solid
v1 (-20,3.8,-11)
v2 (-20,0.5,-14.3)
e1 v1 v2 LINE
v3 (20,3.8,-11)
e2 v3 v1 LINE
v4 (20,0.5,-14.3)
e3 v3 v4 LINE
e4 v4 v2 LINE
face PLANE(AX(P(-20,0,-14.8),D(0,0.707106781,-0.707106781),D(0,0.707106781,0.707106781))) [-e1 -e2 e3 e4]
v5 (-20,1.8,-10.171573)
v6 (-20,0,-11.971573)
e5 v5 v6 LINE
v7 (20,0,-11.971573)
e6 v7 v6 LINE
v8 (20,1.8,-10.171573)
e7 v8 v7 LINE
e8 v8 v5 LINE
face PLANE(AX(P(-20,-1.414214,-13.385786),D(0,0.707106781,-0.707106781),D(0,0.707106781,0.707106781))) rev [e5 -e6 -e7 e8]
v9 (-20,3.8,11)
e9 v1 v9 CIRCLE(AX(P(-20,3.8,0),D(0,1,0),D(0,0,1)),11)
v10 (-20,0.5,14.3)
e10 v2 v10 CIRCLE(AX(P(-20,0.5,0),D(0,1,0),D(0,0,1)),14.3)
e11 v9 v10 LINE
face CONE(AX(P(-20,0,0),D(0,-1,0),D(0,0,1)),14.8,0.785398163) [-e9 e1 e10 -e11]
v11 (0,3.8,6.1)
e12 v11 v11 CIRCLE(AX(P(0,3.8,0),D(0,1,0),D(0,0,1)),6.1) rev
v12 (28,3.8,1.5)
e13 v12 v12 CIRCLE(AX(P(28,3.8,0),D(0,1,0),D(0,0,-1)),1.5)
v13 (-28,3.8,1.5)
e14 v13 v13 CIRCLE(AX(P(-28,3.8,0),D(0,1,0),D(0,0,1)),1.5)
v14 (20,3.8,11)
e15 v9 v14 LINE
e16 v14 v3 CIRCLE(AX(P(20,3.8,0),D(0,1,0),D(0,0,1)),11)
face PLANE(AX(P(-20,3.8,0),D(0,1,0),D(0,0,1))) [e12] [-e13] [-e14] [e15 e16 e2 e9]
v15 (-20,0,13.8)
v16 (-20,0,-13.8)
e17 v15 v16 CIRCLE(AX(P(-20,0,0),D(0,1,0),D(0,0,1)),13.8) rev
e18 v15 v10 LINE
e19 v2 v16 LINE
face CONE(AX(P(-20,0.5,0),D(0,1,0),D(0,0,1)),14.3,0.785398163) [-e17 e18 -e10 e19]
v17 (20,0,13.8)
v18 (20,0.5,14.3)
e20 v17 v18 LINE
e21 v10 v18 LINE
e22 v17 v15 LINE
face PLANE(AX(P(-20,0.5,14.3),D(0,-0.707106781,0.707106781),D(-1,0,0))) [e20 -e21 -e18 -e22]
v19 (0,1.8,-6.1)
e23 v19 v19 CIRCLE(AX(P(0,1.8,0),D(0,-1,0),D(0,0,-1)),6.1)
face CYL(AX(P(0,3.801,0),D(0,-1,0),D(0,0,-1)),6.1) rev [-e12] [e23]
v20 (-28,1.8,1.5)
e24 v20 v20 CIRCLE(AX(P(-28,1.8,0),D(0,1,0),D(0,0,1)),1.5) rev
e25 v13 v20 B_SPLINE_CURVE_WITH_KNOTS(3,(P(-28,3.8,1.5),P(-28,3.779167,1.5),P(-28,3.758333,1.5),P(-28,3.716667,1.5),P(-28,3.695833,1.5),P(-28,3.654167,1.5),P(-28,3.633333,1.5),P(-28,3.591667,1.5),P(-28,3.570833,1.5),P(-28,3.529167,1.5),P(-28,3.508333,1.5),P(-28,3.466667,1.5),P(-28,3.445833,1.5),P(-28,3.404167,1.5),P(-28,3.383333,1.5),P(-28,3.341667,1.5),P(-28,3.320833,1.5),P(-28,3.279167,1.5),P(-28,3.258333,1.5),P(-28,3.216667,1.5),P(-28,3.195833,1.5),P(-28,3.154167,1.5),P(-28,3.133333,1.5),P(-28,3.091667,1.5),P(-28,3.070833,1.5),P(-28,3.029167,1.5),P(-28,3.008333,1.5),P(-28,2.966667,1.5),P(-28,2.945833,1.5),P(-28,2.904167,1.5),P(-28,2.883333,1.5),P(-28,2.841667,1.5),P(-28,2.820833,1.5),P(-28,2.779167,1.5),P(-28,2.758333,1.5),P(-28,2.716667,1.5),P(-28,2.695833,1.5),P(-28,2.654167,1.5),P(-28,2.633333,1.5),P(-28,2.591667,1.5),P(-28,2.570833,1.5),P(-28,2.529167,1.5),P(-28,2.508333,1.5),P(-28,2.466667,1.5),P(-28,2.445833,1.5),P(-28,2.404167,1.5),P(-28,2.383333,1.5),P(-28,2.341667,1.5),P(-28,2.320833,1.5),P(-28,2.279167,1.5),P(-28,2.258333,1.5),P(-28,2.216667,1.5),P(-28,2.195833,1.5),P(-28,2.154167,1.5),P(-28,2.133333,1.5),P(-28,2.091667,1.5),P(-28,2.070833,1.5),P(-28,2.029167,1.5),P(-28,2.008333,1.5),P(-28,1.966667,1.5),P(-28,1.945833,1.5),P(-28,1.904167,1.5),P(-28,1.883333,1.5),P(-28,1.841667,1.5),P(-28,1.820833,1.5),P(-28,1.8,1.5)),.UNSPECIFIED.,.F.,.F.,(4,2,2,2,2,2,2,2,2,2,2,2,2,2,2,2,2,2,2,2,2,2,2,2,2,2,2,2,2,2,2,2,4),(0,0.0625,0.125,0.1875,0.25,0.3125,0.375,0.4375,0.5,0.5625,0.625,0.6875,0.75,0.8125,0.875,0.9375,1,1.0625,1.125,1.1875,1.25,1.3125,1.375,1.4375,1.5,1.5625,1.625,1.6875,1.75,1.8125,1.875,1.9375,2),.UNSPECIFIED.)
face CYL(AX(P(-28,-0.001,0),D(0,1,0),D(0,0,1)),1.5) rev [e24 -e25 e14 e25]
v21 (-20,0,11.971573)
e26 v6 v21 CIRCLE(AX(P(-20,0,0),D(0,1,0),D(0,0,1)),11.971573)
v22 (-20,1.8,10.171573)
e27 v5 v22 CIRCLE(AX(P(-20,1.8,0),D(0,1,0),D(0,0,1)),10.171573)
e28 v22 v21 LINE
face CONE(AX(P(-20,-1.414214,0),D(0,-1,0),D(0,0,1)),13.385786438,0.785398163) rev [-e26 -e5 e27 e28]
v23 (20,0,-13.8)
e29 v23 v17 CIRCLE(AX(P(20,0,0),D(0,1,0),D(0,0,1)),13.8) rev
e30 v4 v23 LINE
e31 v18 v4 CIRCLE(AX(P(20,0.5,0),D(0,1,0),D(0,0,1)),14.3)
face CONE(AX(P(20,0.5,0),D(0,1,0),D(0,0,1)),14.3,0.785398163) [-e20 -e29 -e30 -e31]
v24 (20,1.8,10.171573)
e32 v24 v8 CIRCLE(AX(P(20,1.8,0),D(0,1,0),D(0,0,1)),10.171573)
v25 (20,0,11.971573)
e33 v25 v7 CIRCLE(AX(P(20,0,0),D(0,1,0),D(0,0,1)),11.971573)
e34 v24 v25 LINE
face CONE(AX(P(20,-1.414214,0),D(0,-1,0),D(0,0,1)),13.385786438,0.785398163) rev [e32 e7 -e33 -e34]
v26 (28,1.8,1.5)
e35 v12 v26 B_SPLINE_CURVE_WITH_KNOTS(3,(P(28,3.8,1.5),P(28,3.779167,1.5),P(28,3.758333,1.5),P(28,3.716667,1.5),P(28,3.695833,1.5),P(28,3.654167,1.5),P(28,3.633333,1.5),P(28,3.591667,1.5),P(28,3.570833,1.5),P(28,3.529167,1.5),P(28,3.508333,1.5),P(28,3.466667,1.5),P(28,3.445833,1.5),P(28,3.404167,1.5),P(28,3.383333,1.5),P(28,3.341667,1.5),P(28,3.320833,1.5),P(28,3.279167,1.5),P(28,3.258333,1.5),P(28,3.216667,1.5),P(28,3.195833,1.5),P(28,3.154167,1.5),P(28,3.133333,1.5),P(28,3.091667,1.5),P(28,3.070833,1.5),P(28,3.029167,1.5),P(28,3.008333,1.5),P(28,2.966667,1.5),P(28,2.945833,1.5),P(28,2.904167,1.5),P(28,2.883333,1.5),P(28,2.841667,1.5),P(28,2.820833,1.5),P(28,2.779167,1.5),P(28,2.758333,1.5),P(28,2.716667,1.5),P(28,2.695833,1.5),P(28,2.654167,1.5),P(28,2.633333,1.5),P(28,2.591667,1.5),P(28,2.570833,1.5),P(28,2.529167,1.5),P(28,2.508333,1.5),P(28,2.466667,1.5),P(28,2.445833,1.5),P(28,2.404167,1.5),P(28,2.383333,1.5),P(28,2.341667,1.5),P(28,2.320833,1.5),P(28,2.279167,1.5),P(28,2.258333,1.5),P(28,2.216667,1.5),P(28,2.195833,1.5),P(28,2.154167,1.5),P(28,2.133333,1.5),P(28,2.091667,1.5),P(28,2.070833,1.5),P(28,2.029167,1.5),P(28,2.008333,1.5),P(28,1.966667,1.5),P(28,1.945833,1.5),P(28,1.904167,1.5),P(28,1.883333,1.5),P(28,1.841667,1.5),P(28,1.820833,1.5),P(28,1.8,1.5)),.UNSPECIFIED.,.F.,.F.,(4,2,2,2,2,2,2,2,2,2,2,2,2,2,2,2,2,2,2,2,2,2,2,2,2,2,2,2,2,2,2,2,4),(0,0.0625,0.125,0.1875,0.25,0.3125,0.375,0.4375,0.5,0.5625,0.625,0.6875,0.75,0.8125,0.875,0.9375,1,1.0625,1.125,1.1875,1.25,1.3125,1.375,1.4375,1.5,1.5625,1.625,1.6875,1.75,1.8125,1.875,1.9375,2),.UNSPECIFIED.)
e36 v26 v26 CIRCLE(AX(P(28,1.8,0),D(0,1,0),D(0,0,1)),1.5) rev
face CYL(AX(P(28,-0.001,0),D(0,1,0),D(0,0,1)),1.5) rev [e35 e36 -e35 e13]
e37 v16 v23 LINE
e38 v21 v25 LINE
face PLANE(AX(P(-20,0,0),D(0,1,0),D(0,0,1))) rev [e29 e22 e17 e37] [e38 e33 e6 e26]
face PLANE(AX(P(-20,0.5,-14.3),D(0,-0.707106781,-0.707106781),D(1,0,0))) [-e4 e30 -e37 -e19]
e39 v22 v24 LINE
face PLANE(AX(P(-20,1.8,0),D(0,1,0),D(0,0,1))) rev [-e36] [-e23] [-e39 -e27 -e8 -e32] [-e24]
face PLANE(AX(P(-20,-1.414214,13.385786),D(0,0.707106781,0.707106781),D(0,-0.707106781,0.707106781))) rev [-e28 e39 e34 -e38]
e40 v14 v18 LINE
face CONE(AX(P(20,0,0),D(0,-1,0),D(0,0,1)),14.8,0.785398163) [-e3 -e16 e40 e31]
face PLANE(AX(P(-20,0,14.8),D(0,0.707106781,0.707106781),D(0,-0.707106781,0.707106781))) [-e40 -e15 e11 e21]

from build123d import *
from OCP.BRepFilletAPI import BRepFilletAPI_MakeChamfer

# Parameters (mm, degrees)
BOSS_EXTRU_1_DEPTH      = 3.8
BOSS_EXTRU_1_TAPER      = 45
COQUE2_DEPTH            = 1.8
COQUE2_DRAFT            = 45
CHANFREIN1_SIZE         = 1
CHANFREIN1_SIZE2        = 0.707106781
ENL_V_MAT_EXTRU_1_REACH = 39.355
ESQUISSE2_R             = 1.5
ENL_V_MAT_EXTRU_2_REACH = 39.215
ESQUISSE3_R             = 6.1


# Read off the part's stored shape, not the designer's step: Coque2
with BuildPart() as part:
    # Esquisse1 → Boss.-Extru.1 (new body)
    with BuildSketch(Plane(origin=(0, 0, 0), x_dir=(1, 0, 0), z_dir=(0, 1, 0))):
        with BuildLine():
            ThreePointArc((-20, 14.8), (-34.8, 0), (-20, -14.8))
            Line((-20, -14.8), (20, -14.8))
            ThreePointArc((20, -14.8), (34.8, 0), (20, 14.8))
            Line((20, 14.8), (-20, 14.8))
        make_face()
    extrude(amount=BOSS_EXTRU_1_DEPTH, taper=BOSS_EXTRU_1_TAPER)


with BuildPart() as coque2_tool:
    # Coque2 outline → Coque2 (with draft: the straight prism first)
    with BuildSketch(Plane(origin=(0, 1.8, 0), x_dir=(1, 0, 0), z_dir=(0, 1, 0))):
        with BuildLine():
            Line((-20, -10.171572875), (20, -10.171572875))
            ThreePointArc((20, -10.171572875), (30.171572875, 0), (20, 10.171572875))
            Line((20, 10.171572875), (-20, 10.171572875))
            ThreePointArc((-20, 10.171572875), (-30.171572875, 0), (-20, -10.171572875))
        make_face()
    extrude(amount=-COQUE2_DEPTH)
    # Coque2: the draft: its side faces are tilted about the plane it starts from
    coque2_sides = [coque2_tool.faces().sort_by_distance(p)[0] for p in [
        (0, 0.9, 10.171572875),
        (30.171572875, 0.9, 0),
        (0, 0.9, -10.171572875),
        (-30.171572875, 0.9, 0),
    ]]
    draft(coque2_sides, Plane(origin=(0, 1.8, 0), x_dir=(1, 0, 0), z_dir=(0, 1, 0)), COQUE2_DRAFT)


with BuildPart() as part_1:
    add(part.part)

    # Coque2: cut by coque2_tool
    add(coque2_tool.part, mode=Mode.SUBTRACT)

    # Chanfrein1: one chamfer whose edges measure the first distance from different faces: ONE call of the kernel's chamfer builder (chamfer() names one face for all edges)
    chanfrein1_edges_1 = [part_1.edges().sort_by_distance(p)[0] for p in [
        (0, 0, -14.8),
        (0, 0, 14.8),
        (-34.8, 0, 0),
    ]]
    chanfrein1_side_1 = [part_1.faces().sort_by_distance(p)[0] for p in [
        (0, 0, -14.043672029),
    ]]
    chanfrein1_edges_2 = [part_1.edges().sort_by_distance(p)[0] for p in [
        (34.8, 0, 0),
    ]]
    chanfrein1_side_2 = [part_1.faces().sort_by_distance(p)[0] for p in [
        (32.9, 1.9, 0),
    ]]
    chanfrein1 = BRepFilletAPI_MakeChamfer(part_1.part.solid().wrapped)
    for e in chanfrein1_edges_1:
        chanfrein1.Add(CHANFREIN1_SIZE, CHANFREIN1_SIZE2, e.wrapped, chanfrein1_side_1[0].wrapped)  # the first distance lies on this face
    for e in chanfrein1_edges_2:
        chanfrein1.Add(CHANFREIN1_SIZE, CHANFREIN1_SIZE2, e.wrapped, chanfrein1_side_2[0].wrapped)  # the first distance lies on this face
    add(Compound.cast(chanfrein1.Shape()), mode=Mode.REPLACE)

    # Esquisse2 → Enlèv. mat.-Extru.1 (cut, up to next)
    with BuildSketch(Plane(origin=(0, 3.8, 0), x_dir=(1, 0, 0), z_dir=(0, 1, 0)), mode=Mode.PRIVATE) as enl_v_mat_extru_1_sk1:
        with Locations(Location((-28, 0, 0), (0, 0, 270))):
            Circle(ESQUISSE2_R)
    enl_v_mat_extru_1_tool1 = extrude(enl_v_mat_extru_1_sk1.sketch, amount=-ENL_V_MAT_EXTRU_1_REACH, mode=Mode.PRIVATE) & part_1.part
    # Esquisse2 → Enlèv. mat.-Extru.1 (cut, up to next)
    with BuildSketch(Plane(origin=(0, 3.8, 0), x_dir=(1, 0, 0), z_dir=(0, 1, 0)), mode=Mode.PRIVATE) as enl_v_mat_extru_1_sk2:
        with Locations(Location((28, 0, 0), (0, 0, 270))):
            Circle(ESQUISSE2_R)
    enl_v_mat_extru_1_tool2 = extrude(enl_v_mat_extru_1_sk2.sketch, amount=-ENL_V_MAT_EXTRU_1_REACH, mode=Mode.PRIVATE) & part_1.part
    add(enl_v_mat_extru_1_tool1.solids().sort_by_distance((-28, 3.8, 0))[0], mode=Mode.SUBTRACT)
    add(enl_v_mat_extru_1_tool2.solids().sort_by_distance((28, 3.8, 0))[0], mode=Mode.SUBTRACT)

    # Esquisse3 → Enlèv. mat.-Extru.2 (cut, up to next)
    with BuildSketch(Plane.XZ.offset(-1.8), mode=Mode.PRIVATE) as enl_v_mat_extru_2_sk1:
        with Locations(Location((0, 0, 0), (0, 0, 270))):
            Circle(ESQUISSE3_R)
    enl_v_mat_extru_2_tool1 = extrude(enl_v_mat_extru_2_sk1.sketch, amount=-ENL_V_MAT_EXTRU_2_REACH, mode=Mode.PRIVATE) & part_1.part
    add(enl_v_mat_extru_2_tool1.solids().sort_by_distance((0, 1.8, 0))[0], mode=Mode.SUBTRACT)


solid = part_1.part
